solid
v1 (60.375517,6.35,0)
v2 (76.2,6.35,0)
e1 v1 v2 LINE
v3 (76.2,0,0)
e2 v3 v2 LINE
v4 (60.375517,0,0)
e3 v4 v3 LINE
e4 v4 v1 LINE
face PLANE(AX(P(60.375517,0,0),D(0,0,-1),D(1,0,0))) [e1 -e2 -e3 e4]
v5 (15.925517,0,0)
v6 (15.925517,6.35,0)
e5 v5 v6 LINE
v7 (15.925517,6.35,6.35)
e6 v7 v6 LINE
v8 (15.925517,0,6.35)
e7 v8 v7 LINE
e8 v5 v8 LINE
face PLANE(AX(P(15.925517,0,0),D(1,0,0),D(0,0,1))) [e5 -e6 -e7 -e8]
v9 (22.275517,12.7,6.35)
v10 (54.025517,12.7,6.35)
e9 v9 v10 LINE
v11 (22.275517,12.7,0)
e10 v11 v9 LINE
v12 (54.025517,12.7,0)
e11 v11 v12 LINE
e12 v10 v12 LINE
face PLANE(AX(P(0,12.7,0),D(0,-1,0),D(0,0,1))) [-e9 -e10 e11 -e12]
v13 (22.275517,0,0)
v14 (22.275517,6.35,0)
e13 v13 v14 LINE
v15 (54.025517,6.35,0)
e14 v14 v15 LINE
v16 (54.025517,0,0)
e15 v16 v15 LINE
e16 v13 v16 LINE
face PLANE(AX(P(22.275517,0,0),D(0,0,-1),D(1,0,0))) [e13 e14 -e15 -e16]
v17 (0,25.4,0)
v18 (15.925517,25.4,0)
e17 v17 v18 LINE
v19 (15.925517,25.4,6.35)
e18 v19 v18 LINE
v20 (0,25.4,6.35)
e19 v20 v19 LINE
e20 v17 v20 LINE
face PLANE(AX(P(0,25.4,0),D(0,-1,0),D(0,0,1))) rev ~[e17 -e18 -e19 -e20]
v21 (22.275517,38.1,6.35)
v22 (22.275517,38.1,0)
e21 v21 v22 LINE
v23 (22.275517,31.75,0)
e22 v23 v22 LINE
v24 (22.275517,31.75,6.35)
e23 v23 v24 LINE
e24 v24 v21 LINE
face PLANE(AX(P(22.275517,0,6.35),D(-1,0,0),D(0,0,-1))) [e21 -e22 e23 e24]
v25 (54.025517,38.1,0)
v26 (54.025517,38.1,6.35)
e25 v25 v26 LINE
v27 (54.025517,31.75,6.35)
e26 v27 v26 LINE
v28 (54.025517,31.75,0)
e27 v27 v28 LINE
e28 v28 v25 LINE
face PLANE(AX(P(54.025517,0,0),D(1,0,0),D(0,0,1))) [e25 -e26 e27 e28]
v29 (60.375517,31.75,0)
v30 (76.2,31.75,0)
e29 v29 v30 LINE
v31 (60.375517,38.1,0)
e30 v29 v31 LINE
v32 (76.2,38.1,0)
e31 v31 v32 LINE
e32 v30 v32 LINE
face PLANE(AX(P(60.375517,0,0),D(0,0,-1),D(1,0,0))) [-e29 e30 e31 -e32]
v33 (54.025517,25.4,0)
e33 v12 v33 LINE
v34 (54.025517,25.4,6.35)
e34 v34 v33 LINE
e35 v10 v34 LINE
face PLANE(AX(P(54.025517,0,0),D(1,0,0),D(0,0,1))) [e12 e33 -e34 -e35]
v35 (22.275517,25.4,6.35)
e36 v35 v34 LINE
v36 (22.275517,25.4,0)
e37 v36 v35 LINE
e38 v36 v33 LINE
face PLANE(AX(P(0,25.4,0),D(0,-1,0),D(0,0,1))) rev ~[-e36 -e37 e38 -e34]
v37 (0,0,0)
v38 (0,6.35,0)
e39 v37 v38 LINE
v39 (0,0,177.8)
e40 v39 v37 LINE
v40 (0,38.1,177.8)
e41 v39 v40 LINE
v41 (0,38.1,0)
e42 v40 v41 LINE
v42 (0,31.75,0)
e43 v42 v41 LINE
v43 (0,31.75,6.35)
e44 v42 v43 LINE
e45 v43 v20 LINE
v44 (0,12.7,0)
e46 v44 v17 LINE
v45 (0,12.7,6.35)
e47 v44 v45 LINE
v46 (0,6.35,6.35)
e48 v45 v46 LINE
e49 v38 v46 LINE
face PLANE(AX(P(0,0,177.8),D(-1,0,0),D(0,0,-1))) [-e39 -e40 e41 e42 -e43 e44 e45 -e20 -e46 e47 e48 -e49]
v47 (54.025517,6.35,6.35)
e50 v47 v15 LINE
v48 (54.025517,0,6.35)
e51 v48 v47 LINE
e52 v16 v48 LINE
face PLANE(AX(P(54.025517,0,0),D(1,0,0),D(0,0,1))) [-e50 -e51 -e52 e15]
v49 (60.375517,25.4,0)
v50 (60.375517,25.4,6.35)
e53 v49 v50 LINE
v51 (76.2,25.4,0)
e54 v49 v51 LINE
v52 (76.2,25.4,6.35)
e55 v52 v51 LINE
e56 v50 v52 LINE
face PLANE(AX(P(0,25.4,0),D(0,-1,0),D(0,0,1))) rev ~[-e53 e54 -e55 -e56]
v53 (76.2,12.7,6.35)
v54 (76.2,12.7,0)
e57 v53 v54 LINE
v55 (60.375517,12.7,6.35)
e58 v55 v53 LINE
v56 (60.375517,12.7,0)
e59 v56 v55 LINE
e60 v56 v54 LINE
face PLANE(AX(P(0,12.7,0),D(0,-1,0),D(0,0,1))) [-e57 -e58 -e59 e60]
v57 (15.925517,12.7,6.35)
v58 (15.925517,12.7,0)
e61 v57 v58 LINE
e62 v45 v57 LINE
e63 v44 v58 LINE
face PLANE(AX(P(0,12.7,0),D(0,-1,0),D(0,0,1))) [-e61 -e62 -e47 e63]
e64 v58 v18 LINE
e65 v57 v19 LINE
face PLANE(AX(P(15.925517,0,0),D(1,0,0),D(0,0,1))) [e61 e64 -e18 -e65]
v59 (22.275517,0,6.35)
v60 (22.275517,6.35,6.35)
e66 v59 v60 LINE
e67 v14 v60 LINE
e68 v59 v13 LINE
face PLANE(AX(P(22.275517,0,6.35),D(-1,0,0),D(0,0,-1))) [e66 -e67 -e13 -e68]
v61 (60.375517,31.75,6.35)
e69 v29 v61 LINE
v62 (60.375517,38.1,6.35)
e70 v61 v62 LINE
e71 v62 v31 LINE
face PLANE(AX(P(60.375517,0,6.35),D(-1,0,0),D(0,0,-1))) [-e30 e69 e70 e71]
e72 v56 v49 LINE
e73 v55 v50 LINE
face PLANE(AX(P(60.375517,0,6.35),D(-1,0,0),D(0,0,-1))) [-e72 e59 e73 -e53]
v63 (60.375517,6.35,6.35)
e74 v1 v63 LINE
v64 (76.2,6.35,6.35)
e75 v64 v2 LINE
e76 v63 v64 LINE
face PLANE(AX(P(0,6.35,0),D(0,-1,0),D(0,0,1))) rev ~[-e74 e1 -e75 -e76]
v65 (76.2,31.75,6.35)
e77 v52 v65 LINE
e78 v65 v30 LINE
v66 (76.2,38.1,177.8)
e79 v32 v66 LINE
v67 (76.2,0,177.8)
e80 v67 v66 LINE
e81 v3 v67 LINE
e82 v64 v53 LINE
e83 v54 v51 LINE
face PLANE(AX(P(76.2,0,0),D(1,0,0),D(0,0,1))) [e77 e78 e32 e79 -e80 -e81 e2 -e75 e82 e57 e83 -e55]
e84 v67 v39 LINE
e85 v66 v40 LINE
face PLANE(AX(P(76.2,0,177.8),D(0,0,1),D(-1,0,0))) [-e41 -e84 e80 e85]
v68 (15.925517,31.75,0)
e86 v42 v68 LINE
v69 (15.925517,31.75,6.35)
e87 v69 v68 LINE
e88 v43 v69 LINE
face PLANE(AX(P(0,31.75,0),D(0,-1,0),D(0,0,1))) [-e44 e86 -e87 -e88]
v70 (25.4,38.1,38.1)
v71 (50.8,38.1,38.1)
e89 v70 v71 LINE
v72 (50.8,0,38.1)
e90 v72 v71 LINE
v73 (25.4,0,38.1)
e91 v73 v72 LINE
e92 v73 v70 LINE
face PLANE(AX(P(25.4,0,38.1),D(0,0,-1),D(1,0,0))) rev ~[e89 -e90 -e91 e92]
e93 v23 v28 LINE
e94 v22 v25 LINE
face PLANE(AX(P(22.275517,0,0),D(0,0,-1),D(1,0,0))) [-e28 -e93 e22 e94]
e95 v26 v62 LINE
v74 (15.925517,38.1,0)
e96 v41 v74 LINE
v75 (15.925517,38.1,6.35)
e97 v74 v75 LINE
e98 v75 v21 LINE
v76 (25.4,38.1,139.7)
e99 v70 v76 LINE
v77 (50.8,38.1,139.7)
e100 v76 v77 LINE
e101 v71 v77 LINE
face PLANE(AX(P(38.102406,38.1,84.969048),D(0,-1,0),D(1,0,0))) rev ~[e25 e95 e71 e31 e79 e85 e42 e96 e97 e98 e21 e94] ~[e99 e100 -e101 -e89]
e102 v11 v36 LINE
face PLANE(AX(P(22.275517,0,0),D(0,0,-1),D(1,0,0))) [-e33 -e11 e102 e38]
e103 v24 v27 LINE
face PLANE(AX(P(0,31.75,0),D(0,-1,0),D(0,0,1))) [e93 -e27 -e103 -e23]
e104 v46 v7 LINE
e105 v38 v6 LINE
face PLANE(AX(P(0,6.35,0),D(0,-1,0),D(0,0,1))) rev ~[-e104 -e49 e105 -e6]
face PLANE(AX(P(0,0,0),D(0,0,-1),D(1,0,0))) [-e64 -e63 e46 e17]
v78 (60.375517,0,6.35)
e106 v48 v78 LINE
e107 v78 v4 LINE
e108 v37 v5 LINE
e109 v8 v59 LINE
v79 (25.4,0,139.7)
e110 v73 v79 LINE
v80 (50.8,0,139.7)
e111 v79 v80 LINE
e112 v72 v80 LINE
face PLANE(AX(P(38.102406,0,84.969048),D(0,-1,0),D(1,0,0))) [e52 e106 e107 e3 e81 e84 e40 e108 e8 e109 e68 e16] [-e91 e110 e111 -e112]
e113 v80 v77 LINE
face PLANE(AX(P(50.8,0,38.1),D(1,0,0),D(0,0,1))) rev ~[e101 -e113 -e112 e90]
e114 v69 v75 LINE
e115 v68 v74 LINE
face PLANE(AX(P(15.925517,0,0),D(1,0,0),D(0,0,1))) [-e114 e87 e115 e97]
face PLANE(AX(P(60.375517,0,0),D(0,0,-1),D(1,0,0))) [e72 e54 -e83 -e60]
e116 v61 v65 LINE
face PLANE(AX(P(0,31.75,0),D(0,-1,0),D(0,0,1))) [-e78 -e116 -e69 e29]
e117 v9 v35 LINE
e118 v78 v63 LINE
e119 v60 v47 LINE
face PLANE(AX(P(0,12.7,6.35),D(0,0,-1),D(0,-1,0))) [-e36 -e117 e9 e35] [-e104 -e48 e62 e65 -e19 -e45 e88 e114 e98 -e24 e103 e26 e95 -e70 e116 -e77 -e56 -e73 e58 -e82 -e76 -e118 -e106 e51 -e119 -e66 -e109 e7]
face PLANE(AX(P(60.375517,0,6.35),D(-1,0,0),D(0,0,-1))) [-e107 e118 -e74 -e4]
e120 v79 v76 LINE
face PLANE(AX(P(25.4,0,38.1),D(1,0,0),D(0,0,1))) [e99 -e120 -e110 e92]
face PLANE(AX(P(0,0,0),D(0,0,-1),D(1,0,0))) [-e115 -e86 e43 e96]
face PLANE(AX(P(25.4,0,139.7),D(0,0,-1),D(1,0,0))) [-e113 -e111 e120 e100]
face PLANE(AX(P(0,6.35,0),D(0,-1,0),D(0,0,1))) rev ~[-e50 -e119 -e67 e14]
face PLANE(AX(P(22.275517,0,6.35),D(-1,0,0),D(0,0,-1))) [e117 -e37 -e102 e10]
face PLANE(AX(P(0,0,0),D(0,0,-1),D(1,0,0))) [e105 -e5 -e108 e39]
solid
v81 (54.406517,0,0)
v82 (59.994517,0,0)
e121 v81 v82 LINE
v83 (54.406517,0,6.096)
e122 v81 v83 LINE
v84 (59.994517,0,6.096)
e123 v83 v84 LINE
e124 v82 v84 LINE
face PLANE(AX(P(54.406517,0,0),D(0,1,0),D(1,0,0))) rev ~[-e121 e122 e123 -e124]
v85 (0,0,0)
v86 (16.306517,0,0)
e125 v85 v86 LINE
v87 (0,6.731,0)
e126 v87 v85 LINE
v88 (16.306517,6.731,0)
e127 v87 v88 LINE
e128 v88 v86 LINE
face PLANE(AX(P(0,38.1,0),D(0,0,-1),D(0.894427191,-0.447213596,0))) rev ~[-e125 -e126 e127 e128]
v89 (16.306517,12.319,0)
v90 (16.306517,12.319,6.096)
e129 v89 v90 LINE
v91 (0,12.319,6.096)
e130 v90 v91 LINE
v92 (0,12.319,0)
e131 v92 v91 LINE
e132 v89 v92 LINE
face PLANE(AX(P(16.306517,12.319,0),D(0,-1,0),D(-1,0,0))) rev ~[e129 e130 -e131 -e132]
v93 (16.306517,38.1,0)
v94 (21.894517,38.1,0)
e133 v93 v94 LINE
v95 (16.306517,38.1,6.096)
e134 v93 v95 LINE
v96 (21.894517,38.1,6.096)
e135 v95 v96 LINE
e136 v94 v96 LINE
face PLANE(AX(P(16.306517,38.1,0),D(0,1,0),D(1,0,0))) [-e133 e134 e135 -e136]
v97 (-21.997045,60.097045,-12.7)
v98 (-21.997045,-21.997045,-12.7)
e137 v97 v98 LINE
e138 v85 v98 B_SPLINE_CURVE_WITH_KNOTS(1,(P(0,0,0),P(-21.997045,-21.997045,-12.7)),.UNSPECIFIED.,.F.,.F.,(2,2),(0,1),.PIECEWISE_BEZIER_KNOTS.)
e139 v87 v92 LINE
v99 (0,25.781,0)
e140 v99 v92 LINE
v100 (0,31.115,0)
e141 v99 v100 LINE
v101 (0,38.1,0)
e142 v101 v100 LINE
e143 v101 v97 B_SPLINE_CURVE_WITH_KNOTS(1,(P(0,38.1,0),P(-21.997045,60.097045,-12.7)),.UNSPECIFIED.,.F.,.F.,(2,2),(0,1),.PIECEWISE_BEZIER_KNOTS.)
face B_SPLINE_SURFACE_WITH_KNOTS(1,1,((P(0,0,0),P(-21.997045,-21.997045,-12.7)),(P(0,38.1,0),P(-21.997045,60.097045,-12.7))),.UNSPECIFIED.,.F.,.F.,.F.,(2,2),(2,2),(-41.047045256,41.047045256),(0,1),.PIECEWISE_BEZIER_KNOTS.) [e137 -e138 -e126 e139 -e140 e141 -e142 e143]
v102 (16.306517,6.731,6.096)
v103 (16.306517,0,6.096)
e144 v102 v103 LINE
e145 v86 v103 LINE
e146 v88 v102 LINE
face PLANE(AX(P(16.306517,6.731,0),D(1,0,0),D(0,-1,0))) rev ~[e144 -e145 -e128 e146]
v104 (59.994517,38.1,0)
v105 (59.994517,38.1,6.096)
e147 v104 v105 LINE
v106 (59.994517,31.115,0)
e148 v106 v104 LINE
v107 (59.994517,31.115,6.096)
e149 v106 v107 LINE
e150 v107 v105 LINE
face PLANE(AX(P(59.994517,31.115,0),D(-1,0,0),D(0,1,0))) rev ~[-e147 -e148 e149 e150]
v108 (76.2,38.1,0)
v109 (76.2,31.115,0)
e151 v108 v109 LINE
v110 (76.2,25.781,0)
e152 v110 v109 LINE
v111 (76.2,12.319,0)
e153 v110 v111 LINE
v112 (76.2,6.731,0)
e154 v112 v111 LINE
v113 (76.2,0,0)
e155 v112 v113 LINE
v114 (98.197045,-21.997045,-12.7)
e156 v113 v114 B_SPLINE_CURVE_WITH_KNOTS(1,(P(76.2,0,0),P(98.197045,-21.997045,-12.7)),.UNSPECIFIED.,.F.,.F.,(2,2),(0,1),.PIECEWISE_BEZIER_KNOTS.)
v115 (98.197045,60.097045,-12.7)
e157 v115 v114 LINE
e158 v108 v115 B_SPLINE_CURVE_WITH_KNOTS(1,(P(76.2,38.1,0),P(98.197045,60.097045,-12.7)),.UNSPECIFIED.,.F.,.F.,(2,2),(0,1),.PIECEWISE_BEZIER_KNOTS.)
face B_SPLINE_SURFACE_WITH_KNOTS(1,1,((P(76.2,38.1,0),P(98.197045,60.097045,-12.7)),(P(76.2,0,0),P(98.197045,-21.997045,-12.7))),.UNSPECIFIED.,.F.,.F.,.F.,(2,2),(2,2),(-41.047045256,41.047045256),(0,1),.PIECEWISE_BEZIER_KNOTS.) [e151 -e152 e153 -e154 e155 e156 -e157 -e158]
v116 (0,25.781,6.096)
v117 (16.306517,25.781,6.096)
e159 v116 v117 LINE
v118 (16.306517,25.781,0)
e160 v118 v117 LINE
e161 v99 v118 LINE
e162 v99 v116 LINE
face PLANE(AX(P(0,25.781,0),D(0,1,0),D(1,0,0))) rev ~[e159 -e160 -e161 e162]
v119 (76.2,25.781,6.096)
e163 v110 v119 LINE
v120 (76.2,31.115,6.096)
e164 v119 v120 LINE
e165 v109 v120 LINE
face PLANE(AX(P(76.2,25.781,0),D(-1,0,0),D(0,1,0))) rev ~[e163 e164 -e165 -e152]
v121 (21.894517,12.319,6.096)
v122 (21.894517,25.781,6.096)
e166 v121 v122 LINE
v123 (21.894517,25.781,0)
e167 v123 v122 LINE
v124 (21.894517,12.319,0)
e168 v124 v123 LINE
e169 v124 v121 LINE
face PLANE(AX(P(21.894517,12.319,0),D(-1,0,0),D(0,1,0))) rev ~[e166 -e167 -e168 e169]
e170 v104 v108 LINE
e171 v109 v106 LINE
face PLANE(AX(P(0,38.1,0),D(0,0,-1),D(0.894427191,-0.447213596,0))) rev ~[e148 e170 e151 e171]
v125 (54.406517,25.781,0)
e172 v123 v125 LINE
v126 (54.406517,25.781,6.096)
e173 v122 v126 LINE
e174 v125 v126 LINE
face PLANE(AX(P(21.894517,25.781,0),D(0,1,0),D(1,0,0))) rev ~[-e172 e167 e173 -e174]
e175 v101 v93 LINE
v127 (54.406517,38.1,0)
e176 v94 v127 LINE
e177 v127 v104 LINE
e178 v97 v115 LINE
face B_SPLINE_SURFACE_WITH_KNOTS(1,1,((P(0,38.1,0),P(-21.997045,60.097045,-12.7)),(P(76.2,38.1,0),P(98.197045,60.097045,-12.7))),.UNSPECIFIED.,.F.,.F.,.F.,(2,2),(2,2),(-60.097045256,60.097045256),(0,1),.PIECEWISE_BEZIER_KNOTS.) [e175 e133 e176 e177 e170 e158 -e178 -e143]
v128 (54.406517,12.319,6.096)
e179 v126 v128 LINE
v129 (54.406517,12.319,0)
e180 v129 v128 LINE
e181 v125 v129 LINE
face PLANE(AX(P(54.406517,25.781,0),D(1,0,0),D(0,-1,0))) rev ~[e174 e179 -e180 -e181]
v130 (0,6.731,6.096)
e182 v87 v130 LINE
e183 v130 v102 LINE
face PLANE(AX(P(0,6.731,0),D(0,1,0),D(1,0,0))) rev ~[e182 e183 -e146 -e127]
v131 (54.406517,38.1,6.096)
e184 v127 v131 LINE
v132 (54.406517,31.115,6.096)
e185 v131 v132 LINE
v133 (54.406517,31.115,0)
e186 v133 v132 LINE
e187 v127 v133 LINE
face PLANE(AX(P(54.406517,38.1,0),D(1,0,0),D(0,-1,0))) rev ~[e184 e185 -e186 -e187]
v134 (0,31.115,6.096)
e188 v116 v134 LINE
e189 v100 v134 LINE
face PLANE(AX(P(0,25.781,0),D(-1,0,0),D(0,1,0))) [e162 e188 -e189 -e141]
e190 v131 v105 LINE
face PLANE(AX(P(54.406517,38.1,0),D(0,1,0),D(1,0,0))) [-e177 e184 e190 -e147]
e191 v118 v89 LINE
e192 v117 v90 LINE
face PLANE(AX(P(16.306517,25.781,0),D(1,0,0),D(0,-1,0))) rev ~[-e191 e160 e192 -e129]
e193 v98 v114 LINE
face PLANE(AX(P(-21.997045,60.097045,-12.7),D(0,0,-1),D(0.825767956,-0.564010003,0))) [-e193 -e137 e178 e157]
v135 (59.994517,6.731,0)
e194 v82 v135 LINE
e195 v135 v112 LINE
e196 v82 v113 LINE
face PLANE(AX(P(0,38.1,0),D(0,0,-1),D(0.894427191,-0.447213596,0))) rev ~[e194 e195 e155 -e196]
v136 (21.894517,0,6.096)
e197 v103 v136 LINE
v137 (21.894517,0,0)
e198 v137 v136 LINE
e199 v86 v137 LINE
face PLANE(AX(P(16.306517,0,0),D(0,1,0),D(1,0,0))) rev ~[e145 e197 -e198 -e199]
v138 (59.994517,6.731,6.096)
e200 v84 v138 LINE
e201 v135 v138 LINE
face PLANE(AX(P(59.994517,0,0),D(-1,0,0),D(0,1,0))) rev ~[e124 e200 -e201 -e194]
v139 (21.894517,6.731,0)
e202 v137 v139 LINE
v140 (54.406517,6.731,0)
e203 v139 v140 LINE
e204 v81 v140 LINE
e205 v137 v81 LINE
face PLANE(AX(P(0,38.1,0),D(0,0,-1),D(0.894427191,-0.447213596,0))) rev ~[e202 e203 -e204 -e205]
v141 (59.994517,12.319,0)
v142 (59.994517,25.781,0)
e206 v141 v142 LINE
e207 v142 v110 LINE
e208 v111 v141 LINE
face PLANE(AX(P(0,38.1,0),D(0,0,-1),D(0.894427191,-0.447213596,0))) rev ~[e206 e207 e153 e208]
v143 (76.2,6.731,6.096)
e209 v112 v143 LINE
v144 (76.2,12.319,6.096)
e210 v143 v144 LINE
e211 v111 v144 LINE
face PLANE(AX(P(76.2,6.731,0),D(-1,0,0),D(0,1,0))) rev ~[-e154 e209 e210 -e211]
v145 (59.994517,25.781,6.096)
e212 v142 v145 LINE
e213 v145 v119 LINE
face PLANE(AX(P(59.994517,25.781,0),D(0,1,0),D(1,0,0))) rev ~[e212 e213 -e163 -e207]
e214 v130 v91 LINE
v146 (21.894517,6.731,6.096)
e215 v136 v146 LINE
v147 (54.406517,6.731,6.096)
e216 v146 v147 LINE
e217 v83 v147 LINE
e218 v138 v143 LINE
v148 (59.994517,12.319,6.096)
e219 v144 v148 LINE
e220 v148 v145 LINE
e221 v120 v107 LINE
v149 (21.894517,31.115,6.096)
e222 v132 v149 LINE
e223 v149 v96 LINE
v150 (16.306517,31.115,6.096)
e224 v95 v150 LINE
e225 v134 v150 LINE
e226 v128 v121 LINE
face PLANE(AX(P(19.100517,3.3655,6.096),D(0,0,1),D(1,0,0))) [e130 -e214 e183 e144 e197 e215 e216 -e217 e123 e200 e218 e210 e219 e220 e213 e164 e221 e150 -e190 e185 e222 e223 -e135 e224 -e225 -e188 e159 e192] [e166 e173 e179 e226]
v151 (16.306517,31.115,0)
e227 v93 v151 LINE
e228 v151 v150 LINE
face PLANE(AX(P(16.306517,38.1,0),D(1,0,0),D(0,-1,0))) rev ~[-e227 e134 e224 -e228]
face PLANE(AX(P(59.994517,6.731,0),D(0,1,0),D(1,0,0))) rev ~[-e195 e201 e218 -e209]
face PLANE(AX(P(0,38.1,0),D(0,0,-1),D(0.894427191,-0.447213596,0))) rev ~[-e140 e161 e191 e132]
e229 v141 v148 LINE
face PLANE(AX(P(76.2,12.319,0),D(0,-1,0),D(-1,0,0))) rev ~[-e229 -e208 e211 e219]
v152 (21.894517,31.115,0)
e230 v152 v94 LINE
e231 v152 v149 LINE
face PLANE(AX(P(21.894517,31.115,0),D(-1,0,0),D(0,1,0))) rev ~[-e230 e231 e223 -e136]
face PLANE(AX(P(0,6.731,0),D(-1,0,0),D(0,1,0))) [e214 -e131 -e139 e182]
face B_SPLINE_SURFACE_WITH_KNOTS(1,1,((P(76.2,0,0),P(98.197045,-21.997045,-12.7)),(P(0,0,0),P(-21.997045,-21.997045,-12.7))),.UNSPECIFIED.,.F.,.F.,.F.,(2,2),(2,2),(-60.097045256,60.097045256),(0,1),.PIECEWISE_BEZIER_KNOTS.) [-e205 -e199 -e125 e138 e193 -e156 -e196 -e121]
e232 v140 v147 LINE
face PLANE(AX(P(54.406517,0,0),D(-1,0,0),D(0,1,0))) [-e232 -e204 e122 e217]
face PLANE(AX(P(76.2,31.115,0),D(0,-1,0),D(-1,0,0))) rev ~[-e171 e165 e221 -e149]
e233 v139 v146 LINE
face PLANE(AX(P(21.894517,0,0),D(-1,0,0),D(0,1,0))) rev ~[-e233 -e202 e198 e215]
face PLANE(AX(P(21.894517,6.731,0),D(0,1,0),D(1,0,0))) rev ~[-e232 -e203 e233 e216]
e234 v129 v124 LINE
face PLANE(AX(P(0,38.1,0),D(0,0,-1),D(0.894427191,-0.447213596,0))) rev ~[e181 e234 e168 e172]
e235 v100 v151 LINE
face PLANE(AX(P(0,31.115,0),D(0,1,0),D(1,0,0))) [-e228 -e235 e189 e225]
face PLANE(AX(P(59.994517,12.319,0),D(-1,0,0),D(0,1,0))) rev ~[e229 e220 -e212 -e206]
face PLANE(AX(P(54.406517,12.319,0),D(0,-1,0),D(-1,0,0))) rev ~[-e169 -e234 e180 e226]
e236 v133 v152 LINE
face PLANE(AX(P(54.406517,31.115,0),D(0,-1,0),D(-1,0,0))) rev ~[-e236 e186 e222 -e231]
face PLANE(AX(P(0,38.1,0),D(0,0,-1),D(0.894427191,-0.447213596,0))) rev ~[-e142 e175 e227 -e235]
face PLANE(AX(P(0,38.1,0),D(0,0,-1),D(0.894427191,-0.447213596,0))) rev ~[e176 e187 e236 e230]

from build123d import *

# Parameters (mm, degrees)
F0_W     = 25.4
F0_H     = 101.6
F1_DEPTH = 38.1
F2_W     = 6.35
F2_H     = 6.35
F3_DEPTH = 76.201
F4_W     = 5.588
F4_H     = 6.731
F4_H_2   = 5.588
F4_W_2   = 16.3065173057
F4_H_3   = 13.462
F4_W_3   = 32.512
F4_W_4   = 16.2054826943
F4_H_4   = 5.334
F4_H_5   = 6.985
F5_DEPTH = 6.096
F6_W     = 76.2
F6_H     = 38.1
F7_DEPTH = 12.7
F7_TAPER = -60


with BuildPart() as f1:
    # F0 (on Front) → F1 (new body)
    with BuildSketch(Plane.XZ):
        Polygon((0, 177.8), (0, 0), (15.9255173057, 0), (15.9255173057, 6.35), (22.2755173057, 6.35), (22.2755173057, 0), (54.0255173057, 0), (54.0255173057, 6.35), (60.3755173057, 6.35), (60.3755173057, 0), (76.2, 0), (76.2, 177.8), align=None)
        with Locations((38.1, 88.9)):
            Rectangle(F0_W, F0_H, mode=Mode.SUBTRACT)
    extrude(amount=-F1_DEPTH)

    # F2 (on face) → F3 (cut, through all)
    with BuildSketch(Plane(origin=(0, 0, 0), x_dir=(0, -1, 0), z_dir=(-1, 0, 0))):
        with Locations((-28.575, 3.175)):
            Rectangle(F2_W, F2_H)
        with Locations((-9.525, 3.175)):
            Rectangle(F2_W, F2_H)
    extrude(amount=-F3_DEPTH, mode=Mode.SUBTRACT)


with BuildPart() as f5:
    # F4 (on Top) → F5 (new body)
    with BuildSketch(Plane.XY):
        with Locations((19.1005173057, 3.3655)):
            Rectangle(F4_W, F4_H)
        with Locations((19.1005173057, 9.525)):
            Rectangle(F4_W, F4_H_2)
        with Locations((8.1532586529, 9.525)):
            Rectangle(F4_W_2, F4_H_2)
        with Locations((19.1005173057, 19.05)):
            Rectangle(F4_W, F4_H_3)
        with Locations((38.1505173057, 9.525)):
            Rectangle(F4_W_3, F4_H_2)
        with Locations((57.2005173057, 9.525)):
            Rectangle(F4_W, F4_H_2)
        with Locations((57.2005173057, 3.3655)):
            Rectangle(F4_W, F4_H)
        with Locations((68.0972586529, 9.525)):
            Rectangle(F4_W_4, F4_H_2)
        with Locations((57.2005173057, 19.05)):
            Rectangle(F4_W, F4_H_3)
        with Locations((57.2005173057, 28.448)):
            Rectangle(F4_W, F4_H_4)
        with Locations((68.0972586529, 28.448)):
            Rectangle(F4_W_4, F4_H_4)
        with Locations((57.2005173057, 34.6075)):
            Rectangle(F4_W, F4_H_5)
        with Locations((38.1505173057, 28.448)):
            Rectangle(F4_W_3, F4_H_4)
        with Locations((19.1005173057, 28.448)):
            Rectangle(F4_W, F4_H_4)
        with Locations((19.1005173057, 34.6075)):
            Rectangle(F4_W, F4_H_5)
        with Locations((8.1532586529, 28.448)):
            Rectangle(F4_W_2, F4_H_4)
    extrude(amount=F5_DEPTH)

    # F6 (on face) → F7 (join)
    with BuildSketch(Plane(origin=(0, 0, 0), x_dir=(1, 0, 0), z_dir=(0, 0, -1))):
        with Locations((38.1, -19.05)):
            Rectangle(F6_W, F6_H)
    extrude(amount=F7_DEPTH, taper=F7_TAPER)


solid = Compound([f1.part, f5.part])
